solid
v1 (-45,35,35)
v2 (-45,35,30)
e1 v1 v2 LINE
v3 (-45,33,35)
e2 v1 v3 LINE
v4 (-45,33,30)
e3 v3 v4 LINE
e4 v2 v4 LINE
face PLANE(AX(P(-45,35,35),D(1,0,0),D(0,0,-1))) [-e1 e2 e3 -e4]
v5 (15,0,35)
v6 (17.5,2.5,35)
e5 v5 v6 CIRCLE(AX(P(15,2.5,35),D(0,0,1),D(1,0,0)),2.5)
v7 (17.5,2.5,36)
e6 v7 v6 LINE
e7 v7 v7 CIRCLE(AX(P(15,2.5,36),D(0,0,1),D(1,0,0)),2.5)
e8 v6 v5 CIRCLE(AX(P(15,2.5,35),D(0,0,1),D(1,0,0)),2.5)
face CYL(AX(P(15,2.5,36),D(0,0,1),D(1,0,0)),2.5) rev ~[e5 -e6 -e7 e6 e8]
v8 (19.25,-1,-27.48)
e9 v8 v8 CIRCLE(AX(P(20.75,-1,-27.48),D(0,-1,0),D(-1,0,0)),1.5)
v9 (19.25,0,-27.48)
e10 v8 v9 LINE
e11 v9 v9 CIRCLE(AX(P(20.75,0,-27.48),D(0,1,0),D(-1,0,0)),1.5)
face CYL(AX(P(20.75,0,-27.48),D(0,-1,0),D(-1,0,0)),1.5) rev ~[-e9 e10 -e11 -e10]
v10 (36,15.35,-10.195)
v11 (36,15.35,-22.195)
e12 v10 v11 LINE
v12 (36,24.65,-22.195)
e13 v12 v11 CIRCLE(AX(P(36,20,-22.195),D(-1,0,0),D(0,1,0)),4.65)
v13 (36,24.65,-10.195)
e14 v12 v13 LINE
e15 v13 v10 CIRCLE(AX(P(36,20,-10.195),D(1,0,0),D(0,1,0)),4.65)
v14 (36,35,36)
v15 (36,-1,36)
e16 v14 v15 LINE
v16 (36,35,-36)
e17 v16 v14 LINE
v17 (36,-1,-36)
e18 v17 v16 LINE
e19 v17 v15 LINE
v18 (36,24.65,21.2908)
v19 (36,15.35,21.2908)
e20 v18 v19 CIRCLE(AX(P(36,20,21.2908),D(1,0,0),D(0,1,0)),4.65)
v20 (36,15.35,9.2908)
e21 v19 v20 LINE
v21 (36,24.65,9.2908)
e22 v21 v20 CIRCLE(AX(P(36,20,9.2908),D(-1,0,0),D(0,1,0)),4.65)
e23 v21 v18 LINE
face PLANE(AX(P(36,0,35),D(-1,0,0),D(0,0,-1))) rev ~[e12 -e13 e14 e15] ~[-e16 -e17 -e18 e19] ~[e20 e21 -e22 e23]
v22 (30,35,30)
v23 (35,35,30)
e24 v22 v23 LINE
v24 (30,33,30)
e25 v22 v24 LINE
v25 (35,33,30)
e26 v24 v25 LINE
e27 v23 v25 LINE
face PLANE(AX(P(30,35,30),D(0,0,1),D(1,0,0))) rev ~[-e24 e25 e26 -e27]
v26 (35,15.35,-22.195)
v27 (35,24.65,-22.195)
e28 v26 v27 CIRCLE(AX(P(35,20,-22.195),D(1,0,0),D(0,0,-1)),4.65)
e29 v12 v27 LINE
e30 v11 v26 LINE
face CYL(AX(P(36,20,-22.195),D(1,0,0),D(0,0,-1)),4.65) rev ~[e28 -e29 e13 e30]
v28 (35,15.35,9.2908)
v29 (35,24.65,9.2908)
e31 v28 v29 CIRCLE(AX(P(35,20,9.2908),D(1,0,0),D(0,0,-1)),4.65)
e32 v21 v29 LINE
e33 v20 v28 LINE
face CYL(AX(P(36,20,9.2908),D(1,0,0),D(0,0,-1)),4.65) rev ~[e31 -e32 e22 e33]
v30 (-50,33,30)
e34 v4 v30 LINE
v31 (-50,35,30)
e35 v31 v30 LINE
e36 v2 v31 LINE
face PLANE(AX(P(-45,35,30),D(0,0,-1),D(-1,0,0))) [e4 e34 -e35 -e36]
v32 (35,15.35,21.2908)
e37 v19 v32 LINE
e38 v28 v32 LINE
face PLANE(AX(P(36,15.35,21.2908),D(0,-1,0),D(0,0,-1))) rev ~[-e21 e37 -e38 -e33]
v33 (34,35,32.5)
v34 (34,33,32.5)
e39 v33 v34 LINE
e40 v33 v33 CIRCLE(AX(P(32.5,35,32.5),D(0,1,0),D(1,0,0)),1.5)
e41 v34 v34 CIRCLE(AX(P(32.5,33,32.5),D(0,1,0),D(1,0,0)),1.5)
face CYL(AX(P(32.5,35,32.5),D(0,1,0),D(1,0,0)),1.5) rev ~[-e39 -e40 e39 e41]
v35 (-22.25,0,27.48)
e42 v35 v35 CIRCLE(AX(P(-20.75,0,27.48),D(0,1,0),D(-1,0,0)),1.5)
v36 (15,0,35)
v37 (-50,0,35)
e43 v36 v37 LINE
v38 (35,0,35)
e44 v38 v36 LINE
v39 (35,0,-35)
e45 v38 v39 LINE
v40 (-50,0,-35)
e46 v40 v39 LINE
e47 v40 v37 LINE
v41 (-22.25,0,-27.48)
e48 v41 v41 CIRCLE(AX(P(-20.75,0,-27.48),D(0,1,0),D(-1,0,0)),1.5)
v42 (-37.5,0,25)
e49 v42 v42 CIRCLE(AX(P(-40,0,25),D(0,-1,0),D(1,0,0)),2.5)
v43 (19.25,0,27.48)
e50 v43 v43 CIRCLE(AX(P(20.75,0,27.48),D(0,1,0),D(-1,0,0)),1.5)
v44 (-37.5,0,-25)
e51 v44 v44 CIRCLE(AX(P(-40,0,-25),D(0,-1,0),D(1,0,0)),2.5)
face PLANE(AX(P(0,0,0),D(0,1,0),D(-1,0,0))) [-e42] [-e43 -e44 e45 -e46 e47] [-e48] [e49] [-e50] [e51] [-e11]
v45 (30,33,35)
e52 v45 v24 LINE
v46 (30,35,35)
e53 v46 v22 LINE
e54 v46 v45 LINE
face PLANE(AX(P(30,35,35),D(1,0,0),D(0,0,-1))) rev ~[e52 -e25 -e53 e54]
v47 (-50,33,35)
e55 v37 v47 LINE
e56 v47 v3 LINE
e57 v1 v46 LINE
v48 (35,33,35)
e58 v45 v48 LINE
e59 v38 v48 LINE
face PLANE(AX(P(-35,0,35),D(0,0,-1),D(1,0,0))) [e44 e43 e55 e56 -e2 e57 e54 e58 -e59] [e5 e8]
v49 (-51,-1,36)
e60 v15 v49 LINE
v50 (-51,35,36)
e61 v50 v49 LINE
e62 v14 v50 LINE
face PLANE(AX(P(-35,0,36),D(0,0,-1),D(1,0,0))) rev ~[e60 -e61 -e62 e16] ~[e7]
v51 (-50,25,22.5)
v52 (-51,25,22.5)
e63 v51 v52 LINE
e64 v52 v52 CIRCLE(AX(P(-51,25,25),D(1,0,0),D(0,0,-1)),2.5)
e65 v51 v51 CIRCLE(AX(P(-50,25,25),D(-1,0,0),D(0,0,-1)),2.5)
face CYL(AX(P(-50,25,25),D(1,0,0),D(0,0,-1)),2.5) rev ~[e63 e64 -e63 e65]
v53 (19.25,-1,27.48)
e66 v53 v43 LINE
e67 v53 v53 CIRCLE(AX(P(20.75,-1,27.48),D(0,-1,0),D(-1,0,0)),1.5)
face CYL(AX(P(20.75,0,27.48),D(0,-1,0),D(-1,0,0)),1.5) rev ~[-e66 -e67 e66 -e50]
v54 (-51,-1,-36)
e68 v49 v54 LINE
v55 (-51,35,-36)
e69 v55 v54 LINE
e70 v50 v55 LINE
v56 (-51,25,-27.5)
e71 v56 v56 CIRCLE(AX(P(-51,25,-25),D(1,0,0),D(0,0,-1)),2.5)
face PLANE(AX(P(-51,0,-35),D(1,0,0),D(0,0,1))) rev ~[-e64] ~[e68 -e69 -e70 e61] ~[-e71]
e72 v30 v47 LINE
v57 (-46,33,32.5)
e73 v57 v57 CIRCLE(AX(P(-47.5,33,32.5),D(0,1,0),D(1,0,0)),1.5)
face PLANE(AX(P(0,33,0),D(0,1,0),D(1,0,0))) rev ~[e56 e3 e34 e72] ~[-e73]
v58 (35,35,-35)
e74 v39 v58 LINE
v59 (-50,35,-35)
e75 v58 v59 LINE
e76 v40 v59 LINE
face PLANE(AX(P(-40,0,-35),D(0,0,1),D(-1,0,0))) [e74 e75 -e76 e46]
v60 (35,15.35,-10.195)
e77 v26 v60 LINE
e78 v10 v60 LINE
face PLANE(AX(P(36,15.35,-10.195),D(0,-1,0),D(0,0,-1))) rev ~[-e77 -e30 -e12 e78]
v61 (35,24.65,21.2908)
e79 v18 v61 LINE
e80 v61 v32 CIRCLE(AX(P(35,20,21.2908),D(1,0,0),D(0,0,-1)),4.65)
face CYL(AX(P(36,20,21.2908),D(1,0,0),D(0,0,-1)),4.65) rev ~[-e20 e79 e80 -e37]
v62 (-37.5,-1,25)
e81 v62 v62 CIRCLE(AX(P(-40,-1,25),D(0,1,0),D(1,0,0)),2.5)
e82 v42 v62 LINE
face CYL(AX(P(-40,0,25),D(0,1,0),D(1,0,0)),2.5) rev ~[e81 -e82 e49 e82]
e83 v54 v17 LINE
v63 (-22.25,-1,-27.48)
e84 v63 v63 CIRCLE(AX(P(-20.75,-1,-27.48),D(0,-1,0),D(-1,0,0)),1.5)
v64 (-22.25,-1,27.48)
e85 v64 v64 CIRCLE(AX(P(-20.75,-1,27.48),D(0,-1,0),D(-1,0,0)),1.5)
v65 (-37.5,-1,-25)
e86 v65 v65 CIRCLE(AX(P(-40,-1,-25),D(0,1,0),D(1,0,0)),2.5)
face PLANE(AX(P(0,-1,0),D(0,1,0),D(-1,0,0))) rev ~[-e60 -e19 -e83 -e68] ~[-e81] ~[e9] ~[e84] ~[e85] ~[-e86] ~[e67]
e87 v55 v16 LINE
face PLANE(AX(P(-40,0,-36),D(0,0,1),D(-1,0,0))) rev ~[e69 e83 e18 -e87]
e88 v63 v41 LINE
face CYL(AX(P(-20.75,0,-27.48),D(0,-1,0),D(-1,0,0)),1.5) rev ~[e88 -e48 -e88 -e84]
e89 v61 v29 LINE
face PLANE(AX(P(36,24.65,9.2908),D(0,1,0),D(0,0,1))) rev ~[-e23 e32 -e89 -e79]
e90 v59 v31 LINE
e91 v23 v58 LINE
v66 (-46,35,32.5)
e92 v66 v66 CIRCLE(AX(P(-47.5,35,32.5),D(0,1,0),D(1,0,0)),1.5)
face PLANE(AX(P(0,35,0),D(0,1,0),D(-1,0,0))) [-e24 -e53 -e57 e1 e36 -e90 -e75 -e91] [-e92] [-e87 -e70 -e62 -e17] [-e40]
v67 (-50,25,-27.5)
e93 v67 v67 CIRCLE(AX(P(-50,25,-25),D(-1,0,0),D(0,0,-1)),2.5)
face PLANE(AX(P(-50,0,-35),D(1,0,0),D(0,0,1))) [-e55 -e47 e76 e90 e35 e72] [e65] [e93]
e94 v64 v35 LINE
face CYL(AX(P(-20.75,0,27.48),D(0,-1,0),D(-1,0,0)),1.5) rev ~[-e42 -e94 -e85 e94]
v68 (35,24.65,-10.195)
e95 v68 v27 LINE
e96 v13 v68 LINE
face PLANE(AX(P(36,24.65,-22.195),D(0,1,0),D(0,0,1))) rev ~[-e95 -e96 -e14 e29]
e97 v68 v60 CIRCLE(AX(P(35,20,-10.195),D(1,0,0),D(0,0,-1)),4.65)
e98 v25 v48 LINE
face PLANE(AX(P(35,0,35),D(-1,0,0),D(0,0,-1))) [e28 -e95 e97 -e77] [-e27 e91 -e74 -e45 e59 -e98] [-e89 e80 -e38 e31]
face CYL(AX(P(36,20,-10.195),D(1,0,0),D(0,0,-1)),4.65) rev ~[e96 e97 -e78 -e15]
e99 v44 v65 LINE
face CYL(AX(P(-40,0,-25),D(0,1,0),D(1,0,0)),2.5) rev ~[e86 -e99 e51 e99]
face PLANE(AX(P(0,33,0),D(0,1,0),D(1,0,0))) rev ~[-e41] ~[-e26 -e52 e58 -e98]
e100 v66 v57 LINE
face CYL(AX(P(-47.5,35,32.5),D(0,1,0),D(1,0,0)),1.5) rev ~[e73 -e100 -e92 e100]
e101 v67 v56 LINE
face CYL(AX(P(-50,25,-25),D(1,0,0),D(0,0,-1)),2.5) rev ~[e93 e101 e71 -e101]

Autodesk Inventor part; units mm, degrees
ref_plane "YZ Plane" through (0, 0, 0) normal (1, 0, 0) x (0, 1, 0)
ref_plane "XZ Plane" through (0, 0, 0) normal (0, 1, 0) x (-1, 0, 0)
ref_plane "XY Plane" through (0, 0, 0) normal (0, 0, 1) x (1, 0, 0)
sketch "Esboço1" plane through (0, 0, 0) normal (0, 1, 0) x (-1, 0, 0)
  line L0 (-23.75, -30.48) -> (23.75, -30.48)
  line L1 (23.75, -30.48) -> (23.75, 30.48)
  line L2 (23.75, 30.48) -> (-23.75, 30.48)
  line L3 (-23.75, 30.48) -> (-23.75, -30.48)
  line L4 (-23.75, -30.48) -> (23.75, 30.48) construction
  line L5 (23.75, -30.48) -> (-23.75, 30.48) construction
  line L6 (-35, -35) -> (35, -35)
  line L7 (35, 35) -> (-35, 35)
  line L8 (-35, 35) -> (-35, -35)
  line L9 (-35, -35) -> (35, 35) construction
  line L10 (35, -35) -> (-35, 35) construction
  line L11 (23.75, 30.48) -> (20.75, 30.48)
  line L12 (23.75, 27.48) -> (23.75, 30.48)
  line L13 (-23.75, 30.48) -> (-20.75, 30.48)
  line L14 (-23.75, 27.48) -> (-23.75, 30.48)
  line L15 (-23.75, -30.48) -> (-20.75, -30.48)
  line L16 (-23.75, -27.48) -> (-23.75, -30.48)
  line L17 (23.75, -30.48) -> (20.75, -30.48)
  line L18 (23.75, -27.48) -> (23.75, -30.48)
  circle A0 centre (20.75, 27.48) radius 1.5
  circle A1 centre (-20.75, 27.48) radius 1.5
  circle A2 centre (-20.75, -27.48) radius 1.5
  circle A3 centre (20.75, -27.48) radius 1.5
  line L19 (35, -35) -> (50, -35)
  line L20 (50, -35) -> (50, 35)
  line L21 (50, 35) -> (35, 35)
  line L22 (50, -35) -> (40, -35)
  line L23 (40, -25) -> (40, 25)
  circle A4 centre (40, -25) radius 2.5
  circle A5 centre (40, 25) radius 2.5
  point P0 (0, 0)
  dimension "d0" = 47.5
  dimension "d1" = 60.96
  dimension "d12" = 3
  dimension "d13" = 3
  dimension "d33" = 15
  dimension "d34" = 70
  dimension "d35" = 10
  dimension "d36" = 10
  dimension "d37" = 50
  dimension "d38" = 5
  dimension "d39" = 5
extrude "Extrusão1" add sketch "Esboço1" along normal blind 35 contours L3 L2 L1 L0 | L8 L7 L21 L20 L19 L6 | A4 | A5
shell "Casca1" thickness 1 outward yes removed faces 5 at (6.6326, 35, -8.7485) at (19.2549, 23.3333, 27.3593) at (-22.2451, 23.3333, -27.6007) at (-22.2451, 23.3333, 27.3593) at (19.2549, 23.3333, -27.6007)
sketch "Esboço3" plane through (-50, 0, -35) normal (0, 1, 0) x (1, 0, 0)
  line L0 (0, 0) -> (85, 0) projected
  line L1 (0, 0) -> (10, 0)
  line L2 (10, 0) -> (10, -10)
  line L3 (10, -10) -> (10, -60)
  circle A0 centre (10, -10) radius 2.5
  circle A1 centre (10, -60) radius 2.5
  point P0 (50, -35)
  dimension "d40" = 10
  dimension "d41" = 10
  dimension "d42" = 50
  dimension "d43" = 5
  dimension "d44" = 5
extrude "Extrusão3" cut sketch "Esboço3" against normal blind 1
sketch "Esboço4" plane through (-50, 0, -35) normal (1, 0, 0) x (0, 0, -1)
  line L0 (-70, 0) -> (-70, 35) projected
  line L1 (-70, 35) -> (-60, 35)
  line L2 (-70, 35) -> (0, 35) projected
  line L3 (-60, 35) -> (-60, 25)
  line L4 (0, 0) -> (0, 35) projected
  line L5 (0, 35) -> (-10, 35)
  line L6 (-10, 35) -> (-10, 25)
  circle A0 centre (-60, 25) radius 2.5
  circle A1 centre (-10, 25) radius 2.5
  point P0 (-35, 0)
  dimension "d47" = 10
  dimension "d48" = 10
  dimension "d49" = 10
  dimension "d50" = 10
  dimension "d51" = 5
  dimension "d52" = 5
extrude "Extrusão4" cut sketch "Esboço4" against normal blind 1
sketch "Esboço5" plane through (0, 35, 0) normal (0, 1, 0) x (1, 0, 0)
  line L0 (-50, -35) -> (35, -35) projected
  line L1 (35, -35) -> (30, -35)
  line L2 (30, -35) -> (30, -30)
  line L3 (30, -30) -> (35, -30)
  line L4 (35, -30) -> (35, -35)
  line L5 (-50, -35) -> (-45, -35)
  line L6 (-45, -35) -> (-45, -30)
  line L7 (-45, -30) -> (-50, -30)
  line L8 (-50, -30) -> (-50, -35)
  circle A0 centre (-47.5, -32.5) radius 1.5
  circle A1 centre (32.5, -32.5) radius 1.5
  point P0 (0, 0)
  dimension "d63" = 5
  dimension "d64" = 5
  dimension "d65" = 5
  dimension "d66" = 5
  dimension "d67" = 3
  dimension "d68" = 3
extrude "Extrusão5" add sketch "Esboço5" against normal blind 2
thread "Rosca1" size "M5x0.8" class "6H" standard "ANSI Metric M Profile" full length
thread "Rosca2" size "M5x0.8" class "6H" standard "ANSI Metric M Profile" full length
thread "Rosca3" size "M5x0.8" class "6H" standard "ANSI Metric M Profile" full length
thread "Rosca4" size "M5x0.8" class "6H" standard "ANSI Metric M Profile" full length
sketch "Esboço9" plane through (-51, -1, 36) normal (0, 0, 1) x (1, 0, 0)
  line L0 (86, 1) -> (1, 1) projected
  line L1 (86, 1) -> (66, 1)
  line L2 (66, 1) -> (66, 3.5)
  circle A0 centre (66, 3.5) radius 2.5
  point P0 (51, 1)
  dimension "d101" = 20
  dimension "d102" = 2.5
extrude "Extrusão9" cut sketch "Esboço9" against normal blind 2
sketch "Esboço10" plane through (36, -1, 36) normal (1, 0, 0) x (0, 0, -1)
  line L0 (1, 34) -> (1, 36) projected
  line L1 (1, 36) -> (1, 21)
  line L2 (1, 1) -> (1, 34) projected
  line L3 (71, 1) -> (71, 36) projected
  circle A0 centre (26.7092, 21) radius 4.65
  line L4 (26.7092, 25.65) -> (14.7092, 25.65)
  circle A1 centre (14.7092, 21) radius 4.65
  line L5 (14.7092, 16.35) -> (26.7092, 16.35)
  circle A2 centre (58.195, 21) radius 4.65
  line L6 (58.195, 25.65) -> (46.195, 25.65)
  circle A3 centre (46.195, 21) radius 4.65
  line L7 (46.195, 16.35) -> (58.195, 16.35)
  line L8 (1, 21) -> (71, 21)
  line L9 (34.7126, 21) -> (44.7126, 21)
  point P0 (36, 1)
  dimension "d105" = 15
  dimension "d107" = 9.3
  dimension "d108" = 12
  dimension "d109" = 9.3
  dimension "d110" = 12
  dimension "d111" = 10
extrude "Extrusão10" cut sketch "Esboço10" against normal blind 2
sketch "Esboço11" plane through (-51, -1, 36) normal (0, 0, 1) x (1, 0, 0)
  circle A0 centre (66, 3.5) radius 2.5 projected
properties part number "Caixa de Segurança_Sem fixação"
